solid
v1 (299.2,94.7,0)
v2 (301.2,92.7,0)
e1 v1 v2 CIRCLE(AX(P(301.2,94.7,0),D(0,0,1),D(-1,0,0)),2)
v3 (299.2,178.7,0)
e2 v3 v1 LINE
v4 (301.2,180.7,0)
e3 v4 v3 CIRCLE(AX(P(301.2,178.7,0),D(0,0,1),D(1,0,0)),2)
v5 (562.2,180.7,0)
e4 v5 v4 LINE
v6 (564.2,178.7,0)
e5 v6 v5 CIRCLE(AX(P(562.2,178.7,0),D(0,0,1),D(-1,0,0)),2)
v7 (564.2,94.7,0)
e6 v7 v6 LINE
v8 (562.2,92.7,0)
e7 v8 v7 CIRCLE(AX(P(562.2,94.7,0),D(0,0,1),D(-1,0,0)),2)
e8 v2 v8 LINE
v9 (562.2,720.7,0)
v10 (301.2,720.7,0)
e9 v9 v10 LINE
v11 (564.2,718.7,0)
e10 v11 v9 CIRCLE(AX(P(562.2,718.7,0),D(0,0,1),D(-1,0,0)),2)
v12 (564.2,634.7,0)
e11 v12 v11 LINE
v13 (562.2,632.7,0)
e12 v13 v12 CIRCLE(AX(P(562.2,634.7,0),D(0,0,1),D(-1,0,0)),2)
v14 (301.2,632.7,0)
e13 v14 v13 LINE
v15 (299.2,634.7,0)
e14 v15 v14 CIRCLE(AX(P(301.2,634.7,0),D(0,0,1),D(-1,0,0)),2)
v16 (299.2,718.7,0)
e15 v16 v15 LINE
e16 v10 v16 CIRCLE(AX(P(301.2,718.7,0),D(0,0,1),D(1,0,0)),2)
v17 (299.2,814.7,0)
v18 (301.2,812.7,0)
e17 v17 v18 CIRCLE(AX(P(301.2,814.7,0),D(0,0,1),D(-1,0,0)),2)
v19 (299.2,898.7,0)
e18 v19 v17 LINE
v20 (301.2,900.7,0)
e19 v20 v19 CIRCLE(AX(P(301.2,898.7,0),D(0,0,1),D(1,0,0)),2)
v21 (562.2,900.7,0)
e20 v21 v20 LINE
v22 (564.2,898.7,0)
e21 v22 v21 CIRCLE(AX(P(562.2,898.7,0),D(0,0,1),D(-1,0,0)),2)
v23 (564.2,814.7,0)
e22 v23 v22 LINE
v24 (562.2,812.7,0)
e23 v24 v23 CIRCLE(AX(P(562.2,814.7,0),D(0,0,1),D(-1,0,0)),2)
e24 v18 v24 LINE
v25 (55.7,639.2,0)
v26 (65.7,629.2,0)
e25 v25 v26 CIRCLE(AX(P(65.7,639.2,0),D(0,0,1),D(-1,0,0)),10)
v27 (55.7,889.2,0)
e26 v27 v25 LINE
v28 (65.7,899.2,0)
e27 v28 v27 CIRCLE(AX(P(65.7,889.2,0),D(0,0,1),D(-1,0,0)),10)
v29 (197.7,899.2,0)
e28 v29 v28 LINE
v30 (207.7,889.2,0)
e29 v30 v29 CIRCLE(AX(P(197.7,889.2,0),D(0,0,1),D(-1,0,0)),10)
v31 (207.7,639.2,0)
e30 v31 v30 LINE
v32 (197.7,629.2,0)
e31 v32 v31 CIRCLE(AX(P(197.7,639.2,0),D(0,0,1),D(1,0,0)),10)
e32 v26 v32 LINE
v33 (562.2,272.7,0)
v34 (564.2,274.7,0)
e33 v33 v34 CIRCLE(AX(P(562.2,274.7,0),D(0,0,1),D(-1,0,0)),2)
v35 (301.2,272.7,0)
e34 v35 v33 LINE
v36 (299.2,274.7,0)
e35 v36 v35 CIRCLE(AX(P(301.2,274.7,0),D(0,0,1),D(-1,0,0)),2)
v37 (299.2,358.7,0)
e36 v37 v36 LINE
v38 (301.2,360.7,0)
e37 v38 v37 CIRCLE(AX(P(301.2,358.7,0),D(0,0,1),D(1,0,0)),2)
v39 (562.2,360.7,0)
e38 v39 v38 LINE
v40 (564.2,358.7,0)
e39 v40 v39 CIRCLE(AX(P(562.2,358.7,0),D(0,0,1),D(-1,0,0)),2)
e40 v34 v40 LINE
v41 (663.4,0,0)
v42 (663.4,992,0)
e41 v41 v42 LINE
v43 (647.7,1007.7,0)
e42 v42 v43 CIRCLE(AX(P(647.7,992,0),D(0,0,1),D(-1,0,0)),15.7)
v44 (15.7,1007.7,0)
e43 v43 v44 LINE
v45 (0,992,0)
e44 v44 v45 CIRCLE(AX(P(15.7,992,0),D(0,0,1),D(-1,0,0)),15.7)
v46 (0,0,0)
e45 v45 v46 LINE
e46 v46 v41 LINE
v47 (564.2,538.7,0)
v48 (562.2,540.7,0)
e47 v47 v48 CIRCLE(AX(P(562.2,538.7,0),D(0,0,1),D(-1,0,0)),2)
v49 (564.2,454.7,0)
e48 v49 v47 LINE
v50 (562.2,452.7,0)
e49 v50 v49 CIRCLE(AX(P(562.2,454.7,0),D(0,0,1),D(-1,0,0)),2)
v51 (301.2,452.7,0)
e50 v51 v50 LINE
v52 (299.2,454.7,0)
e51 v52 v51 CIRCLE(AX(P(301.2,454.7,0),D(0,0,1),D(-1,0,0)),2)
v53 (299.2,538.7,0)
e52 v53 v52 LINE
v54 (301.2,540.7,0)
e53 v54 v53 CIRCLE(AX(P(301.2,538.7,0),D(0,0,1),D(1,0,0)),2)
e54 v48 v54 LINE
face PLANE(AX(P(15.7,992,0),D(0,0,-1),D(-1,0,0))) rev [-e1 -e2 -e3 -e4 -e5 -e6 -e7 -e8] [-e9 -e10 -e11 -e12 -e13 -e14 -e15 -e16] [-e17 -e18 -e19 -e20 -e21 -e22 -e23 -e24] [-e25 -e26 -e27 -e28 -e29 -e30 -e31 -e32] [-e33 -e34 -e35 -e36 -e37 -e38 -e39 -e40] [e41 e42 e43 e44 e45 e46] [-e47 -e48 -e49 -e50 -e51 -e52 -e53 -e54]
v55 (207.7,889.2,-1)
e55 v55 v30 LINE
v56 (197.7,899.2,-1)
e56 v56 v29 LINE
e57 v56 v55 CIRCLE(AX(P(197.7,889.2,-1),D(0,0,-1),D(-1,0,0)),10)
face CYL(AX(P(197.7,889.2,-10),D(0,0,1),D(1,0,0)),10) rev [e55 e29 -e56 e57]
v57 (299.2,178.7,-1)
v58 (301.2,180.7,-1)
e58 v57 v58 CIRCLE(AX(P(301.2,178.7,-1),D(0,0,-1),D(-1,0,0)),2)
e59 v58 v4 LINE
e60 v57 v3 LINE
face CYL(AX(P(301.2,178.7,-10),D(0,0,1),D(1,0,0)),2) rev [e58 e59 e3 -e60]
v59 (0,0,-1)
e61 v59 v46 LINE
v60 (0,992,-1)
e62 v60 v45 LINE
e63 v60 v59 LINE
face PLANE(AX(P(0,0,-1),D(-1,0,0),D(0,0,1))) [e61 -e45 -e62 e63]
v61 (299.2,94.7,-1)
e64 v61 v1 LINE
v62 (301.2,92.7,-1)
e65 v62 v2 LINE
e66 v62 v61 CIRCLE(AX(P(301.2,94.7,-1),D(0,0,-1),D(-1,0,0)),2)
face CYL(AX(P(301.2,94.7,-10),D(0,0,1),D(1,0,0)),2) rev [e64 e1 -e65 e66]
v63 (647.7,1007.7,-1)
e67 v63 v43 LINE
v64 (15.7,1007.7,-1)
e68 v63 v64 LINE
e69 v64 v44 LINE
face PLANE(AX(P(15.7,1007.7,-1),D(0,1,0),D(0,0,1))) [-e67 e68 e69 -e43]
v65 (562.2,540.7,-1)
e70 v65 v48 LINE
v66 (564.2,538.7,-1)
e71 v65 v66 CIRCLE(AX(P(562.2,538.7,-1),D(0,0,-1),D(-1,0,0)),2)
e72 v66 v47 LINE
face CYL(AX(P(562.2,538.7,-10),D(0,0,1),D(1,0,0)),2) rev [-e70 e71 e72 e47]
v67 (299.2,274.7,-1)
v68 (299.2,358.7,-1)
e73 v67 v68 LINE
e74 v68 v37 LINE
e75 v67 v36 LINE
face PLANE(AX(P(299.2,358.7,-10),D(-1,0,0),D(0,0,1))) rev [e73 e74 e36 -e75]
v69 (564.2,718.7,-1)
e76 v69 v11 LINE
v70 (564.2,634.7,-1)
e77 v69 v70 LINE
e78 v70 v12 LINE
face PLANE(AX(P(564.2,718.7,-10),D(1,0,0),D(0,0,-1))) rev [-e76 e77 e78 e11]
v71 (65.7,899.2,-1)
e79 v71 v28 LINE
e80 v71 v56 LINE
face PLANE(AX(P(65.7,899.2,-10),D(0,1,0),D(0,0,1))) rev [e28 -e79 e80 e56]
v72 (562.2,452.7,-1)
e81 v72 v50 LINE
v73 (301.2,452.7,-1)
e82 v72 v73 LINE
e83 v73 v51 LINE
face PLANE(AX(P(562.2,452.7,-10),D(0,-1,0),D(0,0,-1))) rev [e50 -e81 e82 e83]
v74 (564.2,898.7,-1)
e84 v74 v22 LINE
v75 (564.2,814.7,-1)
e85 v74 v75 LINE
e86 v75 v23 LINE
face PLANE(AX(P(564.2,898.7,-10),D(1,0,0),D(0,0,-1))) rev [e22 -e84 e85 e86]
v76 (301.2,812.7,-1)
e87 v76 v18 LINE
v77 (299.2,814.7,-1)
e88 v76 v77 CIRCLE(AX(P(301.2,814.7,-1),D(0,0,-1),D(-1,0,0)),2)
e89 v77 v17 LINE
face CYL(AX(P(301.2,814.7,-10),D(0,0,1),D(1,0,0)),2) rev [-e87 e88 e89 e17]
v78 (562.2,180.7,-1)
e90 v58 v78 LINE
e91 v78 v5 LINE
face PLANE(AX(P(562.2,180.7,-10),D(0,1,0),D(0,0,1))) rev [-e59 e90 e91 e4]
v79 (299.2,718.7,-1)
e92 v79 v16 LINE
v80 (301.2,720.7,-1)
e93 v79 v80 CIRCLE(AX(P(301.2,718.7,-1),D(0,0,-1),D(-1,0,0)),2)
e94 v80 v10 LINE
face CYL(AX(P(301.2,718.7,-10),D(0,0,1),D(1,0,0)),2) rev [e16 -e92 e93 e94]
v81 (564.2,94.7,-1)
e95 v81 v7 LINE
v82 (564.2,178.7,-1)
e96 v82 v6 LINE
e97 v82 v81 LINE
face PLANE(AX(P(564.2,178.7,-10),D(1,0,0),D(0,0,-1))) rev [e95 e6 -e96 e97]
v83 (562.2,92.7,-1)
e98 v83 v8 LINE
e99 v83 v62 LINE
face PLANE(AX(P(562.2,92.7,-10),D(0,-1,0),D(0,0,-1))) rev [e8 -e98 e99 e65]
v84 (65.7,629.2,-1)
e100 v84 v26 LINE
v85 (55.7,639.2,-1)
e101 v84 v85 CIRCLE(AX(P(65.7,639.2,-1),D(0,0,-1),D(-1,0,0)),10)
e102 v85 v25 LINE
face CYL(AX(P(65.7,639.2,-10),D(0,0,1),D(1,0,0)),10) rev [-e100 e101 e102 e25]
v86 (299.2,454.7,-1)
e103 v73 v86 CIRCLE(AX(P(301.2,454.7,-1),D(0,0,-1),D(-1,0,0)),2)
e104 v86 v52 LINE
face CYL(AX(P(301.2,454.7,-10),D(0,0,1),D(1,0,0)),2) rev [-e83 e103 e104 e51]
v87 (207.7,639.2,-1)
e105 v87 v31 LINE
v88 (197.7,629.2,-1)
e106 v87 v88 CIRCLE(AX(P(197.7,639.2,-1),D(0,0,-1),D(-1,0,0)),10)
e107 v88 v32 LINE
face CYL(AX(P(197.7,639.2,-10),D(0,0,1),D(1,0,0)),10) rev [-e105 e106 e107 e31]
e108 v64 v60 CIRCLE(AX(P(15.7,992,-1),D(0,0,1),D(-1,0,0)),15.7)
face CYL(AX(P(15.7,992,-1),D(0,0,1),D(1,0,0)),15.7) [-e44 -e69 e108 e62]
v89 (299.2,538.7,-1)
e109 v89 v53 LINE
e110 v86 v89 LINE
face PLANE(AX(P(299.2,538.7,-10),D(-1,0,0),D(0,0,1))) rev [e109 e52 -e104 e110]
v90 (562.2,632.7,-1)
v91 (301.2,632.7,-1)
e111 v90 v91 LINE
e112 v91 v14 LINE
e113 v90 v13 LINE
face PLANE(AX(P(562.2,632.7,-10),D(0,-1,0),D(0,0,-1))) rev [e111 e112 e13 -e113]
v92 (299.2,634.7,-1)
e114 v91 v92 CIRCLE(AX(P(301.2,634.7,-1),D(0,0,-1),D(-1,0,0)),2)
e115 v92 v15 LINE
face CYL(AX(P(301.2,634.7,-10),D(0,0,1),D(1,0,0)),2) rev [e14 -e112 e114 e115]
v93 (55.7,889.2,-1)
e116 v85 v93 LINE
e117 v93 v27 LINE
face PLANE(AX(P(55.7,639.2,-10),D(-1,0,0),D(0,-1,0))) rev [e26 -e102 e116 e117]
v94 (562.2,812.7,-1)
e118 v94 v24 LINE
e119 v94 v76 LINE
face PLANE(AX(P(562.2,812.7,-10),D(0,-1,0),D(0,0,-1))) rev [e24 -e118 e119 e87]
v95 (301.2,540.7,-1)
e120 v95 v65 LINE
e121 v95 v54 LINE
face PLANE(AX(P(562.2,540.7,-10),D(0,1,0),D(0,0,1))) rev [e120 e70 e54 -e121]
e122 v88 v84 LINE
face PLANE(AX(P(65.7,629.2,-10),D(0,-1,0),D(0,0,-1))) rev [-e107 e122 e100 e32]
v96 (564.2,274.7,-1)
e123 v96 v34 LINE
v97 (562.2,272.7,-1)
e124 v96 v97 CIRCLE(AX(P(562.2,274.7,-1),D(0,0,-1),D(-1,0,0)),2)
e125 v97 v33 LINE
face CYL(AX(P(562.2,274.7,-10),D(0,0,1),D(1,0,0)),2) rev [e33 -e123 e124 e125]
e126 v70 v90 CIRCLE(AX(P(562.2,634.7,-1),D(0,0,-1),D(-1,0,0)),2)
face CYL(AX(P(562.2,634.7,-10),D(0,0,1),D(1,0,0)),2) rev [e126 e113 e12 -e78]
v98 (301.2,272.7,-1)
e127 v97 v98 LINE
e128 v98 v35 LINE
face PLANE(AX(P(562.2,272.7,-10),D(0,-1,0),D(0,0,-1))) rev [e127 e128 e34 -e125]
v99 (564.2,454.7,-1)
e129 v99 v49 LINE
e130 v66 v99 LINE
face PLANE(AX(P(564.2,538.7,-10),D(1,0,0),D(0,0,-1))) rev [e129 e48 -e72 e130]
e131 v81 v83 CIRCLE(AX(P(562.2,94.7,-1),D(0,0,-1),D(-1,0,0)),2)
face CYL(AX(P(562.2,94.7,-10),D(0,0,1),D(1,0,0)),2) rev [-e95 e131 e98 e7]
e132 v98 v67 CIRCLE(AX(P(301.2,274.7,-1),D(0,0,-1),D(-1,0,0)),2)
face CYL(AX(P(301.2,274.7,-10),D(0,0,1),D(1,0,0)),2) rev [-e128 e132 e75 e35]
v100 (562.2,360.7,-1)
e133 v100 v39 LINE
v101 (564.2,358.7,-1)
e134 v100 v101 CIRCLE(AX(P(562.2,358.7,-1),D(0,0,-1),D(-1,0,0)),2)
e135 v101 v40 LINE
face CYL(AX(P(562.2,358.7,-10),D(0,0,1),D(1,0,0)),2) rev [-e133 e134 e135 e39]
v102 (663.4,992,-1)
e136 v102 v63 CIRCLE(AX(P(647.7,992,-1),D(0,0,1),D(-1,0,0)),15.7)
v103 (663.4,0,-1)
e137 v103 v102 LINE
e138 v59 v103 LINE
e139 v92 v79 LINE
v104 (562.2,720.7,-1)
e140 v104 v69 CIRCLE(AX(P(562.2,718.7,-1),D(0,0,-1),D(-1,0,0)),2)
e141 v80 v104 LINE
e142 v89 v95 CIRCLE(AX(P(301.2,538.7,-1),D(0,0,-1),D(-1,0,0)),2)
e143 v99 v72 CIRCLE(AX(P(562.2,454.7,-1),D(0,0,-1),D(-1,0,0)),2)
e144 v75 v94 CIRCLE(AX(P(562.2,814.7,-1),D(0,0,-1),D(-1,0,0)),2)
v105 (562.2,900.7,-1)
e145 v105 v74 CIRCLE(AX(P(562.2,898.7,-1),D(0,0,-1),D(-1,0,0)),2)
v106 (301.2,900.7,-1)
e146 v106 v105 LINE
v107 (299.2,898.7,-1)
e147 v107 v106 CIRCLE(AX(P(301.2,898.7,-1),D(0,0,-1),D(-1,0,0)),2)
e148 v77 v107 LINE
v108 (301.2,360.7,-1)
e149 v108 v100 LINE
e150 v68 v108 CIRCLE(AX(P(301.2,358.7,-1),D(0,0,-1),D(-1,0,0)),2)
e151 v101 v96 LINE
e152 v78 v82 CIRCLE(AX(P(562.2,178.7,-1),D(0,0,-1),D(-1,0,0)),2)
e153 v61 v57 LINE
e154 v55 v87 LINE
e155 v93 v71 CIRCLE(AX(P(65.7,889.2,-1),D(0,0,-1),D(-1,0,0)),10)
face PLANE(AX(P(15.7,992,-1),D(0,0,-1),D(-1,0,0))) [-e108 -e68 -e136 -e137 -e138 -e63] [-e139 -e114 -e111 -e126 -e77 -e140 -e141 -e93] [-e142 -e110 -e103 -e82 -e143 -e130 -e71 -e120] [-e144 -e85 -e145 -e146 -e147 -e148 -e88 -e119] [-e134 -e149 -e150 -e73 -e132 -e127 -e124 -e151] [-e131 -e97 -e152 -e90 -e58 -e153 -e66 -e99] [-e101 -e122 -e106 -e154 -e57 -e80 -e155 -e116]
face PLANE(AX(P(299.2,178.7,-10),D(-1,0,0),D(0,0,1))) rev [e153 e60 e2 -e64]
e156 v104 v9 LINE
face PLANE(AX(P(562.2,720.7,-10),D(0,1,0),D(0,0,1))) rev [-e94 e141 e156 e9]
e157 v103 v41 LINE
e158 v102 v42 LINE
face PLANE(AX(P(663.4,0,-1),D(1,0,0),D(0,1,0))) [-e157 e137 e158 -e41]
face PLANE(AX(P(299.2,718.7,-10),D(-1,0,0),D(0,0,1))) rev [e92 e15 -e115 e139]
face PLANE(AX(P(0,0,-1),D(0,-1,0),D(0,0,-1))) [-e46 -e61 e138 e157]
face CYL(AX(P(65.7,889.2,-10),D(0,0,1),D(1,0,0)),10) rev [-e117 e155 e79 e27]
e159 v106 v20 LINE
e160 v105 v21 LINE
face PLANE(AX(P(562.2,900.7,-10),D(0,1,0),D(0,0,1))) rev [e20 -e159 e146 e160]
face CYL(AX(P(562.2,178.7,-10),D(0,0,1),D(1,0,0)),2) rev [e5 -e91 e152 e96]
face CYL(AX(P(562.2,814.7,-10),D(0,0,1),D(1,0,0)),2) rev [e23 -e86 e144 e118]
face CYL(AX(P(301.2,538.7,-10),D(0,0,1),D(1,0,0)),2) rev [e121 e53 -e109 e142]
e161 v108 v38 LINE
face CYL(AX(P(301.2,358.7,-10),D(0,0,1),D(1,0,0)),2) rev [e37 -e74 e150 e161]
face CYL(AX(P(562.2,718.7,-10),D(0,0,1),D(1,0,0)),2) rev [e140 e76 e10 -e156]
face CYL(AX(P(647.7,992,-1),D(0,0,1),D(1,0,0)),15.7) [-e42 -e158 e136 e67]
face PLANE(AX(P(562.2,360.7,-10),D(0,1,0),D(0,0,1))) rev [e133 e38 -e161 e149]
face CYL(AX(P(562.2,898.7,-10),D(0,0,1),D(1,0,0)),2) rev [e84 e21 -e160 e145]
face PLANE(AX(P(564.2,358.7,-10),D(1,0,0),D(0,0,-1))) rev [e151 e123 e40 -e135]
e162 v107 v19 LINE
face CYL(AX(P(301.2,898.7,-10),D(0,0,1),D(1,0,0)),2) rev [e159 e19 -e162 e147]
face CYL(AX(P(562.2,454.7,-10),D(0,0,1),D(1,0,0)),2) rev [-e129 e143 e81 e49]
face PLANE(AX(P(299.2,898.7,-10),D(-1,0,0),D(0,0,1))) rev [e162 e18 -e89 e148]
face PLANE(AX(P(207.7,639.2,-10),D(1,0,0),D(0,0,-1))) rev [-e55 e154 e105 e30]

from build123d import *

# Parameters (mm, degrees)
BASE_FLANGE1_DEPTH = 1
CUT_EXTRUDE1_DEPTH = 10
CUT_EXTRUDE2_DEPTH = 10


# Sheet-metal steps are written as plain solids
with BuildPart() as part:
    # Sketch1 → Base-Flange1 (new body)
    with BuildSketch(Plane.XY):
        with BuildLine():
            Line((0, 0), (663.4, 0))
            Line((663.4, 0), (663.4, 992))
            ThreePointArc((663.4, 992), (658.801576465, 1003.101576465), (647.7, 1007.7))
            Line((647.7, 1007.7), (15.7, 1007.7))
            ThreePointArc((15.7, 1007.7), (4.598423535, 1003.101576465), (0, 992))
            Line((0, 992), (0, 0))
        make_face()
    extrude(amount=-BASE_FLANGE1_DEPTH)

    # Sketch9 → Cut-Extrude1 (cut)
    with BuildSketch(Plane.XY):
        with BuildLine():
            Line((562.2, 900.7), (301.2, 900.7))
            ThreePointArc((301.2, 900.7), (299.785786438, 900.114213562), (299.2, 898.7))
            Line((299.2, 898.7), (299.2, 814.7))
            ThreePointArc((299.2, 814.7), (299.785786438, 813.285786438), (301.2, 812.7))
            Line((301.2, 812.7), (562.2, 812.7))
            ThreePointArc((562.2, 812.7), (563.614213562, 813.285786438), (564.2, 814.7))
            Line((564.2, 814.7), (564.2, 898.7))
            ThreePointArc((564.2, 898.7), (563.614213562, 900.114213562), (562.2, 900.7))
        make_face()
        with BuildLine():
            Line((564.2, 718.7), (564.2, 634.7))
            ThreePointArc((564.2, 634.7), (563.614213562, 633.285786438), (562.2, 632.7))
            Line((562.2, 632.7), (301.2, 632.7))
            ThreePointArc((301.2, 632.7), (299.785786438, 633.285786438), (299.2, 634.7))
            Line((299.2, 634.7), (299.2, 718.7))
            ThreePointArc((299.2, 718.7), (299.785786438, 720.114213562), (301.2, 720.7))
            Line((301.2, 720.7), (562.2, 720.7))
            ThreePointArc((562.2, 720.7), (563.614213562, 720.114213562), (564.2, 718.7))
        make_face()
        with BuildLine():
            Line((564.2, 538.7), (564.2, 454.7))
            ThreePointArc((564.2, 454.7), (563.614213562, 453.285786438), (562.2, 452.7))
            Line((562.2, 452.7), (301.2, 452.7))
            ThreePointArc((301.2, 452.7), (299.785786438, 453.285786438), (299.2, 454.7))
            Line((299.2, 454.7), (299.2, 538.7))
            ThreePointArc((299.2, 538.7), (299.785786438, 540.114213562), (301.2, 540.7))
            Line((301.2, 540.7), (562.2, 540.7))
            ThreePointArc((562.2, 540.7), (563.614213562, 540.114213562), (564.2, 538.7))
        make_face()
        with BuildLine():
            Line((564.2, 358.7), (564.2, 274.7))
            ThreePointArc((564.2, 274.7), (563.614213562, 273.285786438), (562.2, 272.7))
            Line((562.2, 272.7), (301.2, 272.7))
            ThreePointArc((301.2, 272.7), (299.785786438, 273.285786438), (299.2, 274.7))
            Line((299.2, 274.7), (299.2, 358.7))
            ThreePointArc((299.2, 358.7), (299.785786438, 360.114213562), (301.2, 360.7))
            Line((301.2, 360.7), (562.2, 360.7))
            ThreePointArc((562.2, 360.7), (563.614213562, 360.114213562), (564.2, 358.7))
        make_face()
        with BuildLine():
            Line((564.2, 178.7), (564.2, 94.7))
            ThreePointArc((564.2, 94.7), (563.614213562, 93.285786438), (562.2, 92.7))
            Line((562.2, 92.7), (301.2, 92.7))
            ThreePointArc((301.2, 92.7), (299.785786438, 93.285786438), (299.2, 94.7))
            Line((299.2, 94.7), (299.2, 178.7))
            ThreePointArc((299.2, 178.7), (299.785786438, 180.114213562), (301.2, 180.7))
            Line((301.2, 180.7), (562.2, 180.7))
            ThreePointArc((562.2, 180.7), (563.614213562, 180.114213562), (564.2, 178.7))
        make_face()
    extrude(amount=-CUT_EXTRUDE1_DEPTH, mode=Mode.SUBTRACT)

    # Sketch10 → Cut-Extrude2 (cut)
    with BuildSketch(Plane.XY):
        with BuildLine():
            Line((65.7, 629.2), (197.7, 629.2))
            ThreePointArc((197.7, 629.2), (204.771067812, 632.128932188), (207.7, 639.2))
            Line((207.7, 639.2), (207.7, 889.2))
            ThreePointArc((207.7, 889.2), (204.771067812, 896.271067812), (197.7, 899.2))
            Line((197.7, 899.2), (65.7, 899.2))
            ThreePointArc((65.7, 899.2), (58.628932188, 896.271067812), (55.7, 889.2))
            Line((55.7, 889.2), (55.7, 639.2))
            ThreePointArc((55.7, 639.2), (58.628932188, 632.128932188), (65.7, 629.2))
        make_face()
    extrude(amount=-CUT_EXTRUDE2_DEPTH, mode=Mode.SUBTRACT)


solid = part.part
